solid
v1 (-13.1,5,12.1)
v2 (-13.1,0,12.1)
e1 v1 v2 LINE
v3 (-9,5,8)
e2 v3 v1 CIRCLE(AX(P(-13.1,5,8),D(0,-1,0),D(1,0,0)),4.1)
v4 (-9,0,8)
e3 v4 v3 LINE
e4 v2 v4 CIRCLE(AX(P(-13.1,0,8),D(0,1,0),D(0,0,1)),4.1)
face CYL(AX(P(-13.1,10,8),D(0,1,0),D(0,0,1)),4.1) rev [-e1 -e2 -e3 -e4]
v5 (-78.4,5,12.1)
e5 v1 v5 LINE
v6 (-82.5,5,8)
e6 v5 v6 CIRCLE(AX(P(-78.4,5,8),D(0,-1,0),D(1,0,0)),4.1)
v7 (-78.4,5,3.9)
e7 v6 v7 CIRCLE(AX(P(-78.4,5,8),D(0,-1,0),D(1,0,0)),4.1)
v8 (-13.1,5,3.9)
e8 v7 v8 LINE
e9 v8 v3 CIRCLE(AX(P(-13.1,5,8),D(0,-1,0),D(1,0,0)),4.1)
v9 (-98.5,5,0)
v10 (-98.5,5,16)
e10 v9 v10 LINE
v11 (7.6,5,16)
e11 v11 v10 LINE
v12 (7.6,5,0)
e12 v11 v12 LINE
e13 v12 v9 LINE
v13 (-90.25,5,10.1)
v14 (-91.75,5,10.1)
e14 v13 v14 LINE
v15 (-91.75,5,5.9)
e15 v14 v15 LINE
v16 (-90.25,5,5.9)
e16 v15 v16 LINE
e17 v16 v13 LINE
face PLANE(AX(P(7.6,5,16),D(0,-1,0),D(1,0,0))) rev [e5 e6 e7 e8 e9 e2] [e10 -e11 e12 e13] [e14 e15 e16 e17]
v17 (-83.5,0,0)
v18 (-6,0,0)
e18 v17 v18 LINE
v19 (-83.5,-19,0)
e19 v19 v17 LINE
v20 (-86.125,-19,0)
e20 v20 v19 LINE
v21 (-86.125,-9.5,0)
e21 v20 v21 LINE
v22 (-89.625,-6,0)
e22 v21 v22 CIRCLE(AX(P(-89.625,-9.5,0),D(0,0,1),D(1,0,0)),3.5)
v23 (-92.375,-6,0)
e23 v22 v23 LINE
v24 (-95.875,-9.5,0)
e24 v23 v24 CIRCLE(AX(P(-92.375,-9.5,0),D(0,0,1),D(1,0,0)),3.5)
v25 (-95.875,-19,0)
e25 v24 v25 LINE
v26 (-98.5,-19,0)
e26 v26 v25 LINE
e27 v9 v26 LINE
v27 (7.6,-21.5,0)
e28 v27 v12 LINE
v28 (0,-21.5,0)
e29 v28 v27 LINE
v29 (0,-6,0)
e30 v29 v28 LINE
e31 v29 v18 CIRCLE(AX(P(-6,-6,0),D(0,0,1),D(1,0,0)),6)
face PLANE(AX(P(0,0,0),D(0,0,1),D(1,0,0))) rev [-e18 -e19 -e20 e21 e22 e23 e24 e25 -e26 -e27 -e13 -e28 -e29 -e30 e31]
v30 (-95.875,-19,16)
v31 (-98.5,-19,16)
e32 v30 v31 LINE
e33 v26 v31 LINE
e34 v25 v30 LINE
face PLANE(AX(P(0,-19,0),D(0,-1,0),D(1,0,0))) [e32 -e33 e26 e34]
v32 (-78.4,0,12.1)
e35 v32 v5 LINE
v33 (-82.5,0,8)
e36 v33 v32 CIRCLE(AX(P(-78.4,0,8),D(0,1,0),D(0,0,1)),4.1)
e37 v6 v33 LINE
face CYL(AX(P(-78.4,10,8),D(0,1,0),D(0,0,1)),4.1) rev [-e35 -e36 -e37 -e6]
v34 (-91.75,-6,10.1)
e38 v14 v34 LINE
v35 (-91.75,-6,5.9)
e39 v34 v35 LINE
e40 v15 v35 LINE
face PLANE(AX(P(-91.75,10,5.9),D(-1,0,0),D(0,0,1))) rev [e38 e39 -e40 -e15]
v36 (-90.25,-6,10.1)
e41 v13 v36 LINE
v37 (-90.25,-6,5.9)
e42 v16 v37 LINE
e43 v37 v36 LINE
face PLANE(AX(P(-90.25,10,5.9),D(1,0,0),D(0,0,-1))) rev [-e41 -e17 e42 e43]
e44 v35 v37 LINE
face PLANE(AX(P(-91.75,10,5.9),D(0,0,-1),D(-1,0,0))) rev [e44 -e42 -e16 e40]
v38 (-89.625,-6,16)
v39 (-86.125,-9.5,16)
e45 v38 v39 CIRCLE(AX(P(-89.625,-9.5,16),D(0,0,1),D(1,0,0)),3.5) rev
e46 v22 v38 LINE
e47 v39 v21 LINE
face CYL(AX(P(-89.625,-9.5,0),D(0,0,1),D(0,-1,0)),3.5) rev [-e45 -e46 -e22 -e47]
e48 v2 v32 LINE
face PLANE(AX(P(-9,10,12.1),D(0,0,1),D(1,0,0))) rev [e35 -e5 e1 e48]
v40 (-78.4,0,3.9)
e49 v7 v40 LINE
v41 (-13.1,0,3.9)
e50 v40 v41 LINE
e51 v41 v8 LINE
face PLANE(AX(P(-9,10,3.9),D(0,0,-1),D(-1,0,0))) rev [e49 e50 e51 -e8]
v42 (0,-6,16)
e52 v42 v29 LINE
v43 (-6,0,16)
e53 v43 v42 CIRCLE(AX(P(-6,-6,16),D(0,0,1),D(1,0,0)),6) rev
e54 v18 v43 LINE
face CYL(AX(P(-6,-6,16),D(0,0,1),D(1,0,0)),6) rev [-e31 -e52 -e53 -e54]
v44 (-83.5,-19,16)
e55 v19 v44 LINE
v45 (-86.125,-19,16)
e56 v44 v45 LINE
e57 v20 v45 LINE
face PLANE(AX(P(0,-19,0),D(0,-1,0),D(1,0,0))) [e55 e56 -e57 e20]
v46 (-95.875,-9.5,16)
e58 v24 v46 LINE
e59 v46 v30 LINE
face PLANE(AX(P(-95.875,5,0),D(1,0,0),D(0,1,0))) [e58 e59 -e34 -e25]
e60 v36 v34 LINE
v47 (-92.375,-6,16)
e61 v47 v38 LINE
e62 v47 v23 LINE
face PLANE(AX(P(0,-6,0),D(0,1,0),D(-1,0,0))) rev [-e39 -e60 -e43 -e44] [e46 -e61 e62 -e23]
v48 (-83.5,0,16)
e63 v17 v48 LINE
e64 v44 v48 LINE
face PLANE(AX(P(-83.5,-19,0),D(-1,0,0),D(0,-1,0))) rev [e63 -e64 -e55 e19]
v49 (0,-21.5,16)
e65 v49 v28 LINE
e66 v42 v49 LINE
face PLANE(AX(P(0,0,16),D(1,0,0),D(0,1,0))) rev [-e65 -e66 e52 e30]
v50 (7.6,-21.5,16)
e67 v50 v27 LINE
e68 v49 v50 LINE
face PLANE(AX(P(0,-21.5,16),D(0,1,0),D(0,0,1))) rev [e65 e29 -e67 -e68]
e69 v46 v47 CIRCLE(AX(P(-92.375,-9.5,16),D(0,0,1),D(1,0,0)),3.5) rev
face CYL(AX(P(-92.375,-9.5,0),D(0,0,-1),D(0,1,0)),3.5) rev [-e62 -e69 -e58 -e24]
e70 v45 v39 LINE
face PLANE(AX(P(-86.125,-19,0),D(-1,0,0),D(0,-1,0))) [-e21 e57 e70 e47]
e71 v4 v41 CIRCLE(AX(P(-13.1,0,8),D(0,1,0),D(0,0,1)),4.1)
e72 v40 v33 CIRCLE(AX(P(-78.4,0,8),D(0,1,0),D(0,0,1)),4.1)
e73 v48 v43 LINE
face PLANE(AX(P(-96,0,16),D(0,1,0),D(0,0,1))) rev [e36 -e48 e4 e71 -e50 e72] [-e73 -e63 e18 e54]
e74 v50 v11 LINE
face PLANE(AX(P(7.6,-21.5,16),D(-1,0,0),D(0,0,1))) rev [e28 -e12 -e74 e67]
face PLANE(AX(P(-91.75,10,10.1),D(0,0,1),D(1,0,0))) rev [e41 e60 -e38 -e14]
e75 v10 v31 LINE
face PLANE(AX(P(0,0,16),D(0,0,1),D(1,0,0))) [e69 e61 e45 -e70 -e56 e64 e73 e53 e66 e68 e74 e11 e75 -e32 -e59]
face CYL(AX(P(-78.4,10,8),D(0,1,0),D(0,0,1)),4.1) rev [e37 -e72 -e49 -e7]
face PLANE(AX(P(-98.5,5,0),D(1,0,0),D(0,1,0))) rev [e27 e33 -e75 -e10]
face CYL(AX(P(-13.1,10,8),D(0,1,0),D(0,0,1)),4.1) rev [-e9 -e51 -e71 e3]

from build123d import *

# Parameters (mm, degrees)
EXTRUDE_1_DEPTH     = 16
SKETCH_4_W          = 1.5
SKETCH_4_H          = 4.2
SKETCH_4_W_2        = 73.5
SKETCH_4_H_2        = 8.2
CUT_EXTRUDE_1_DEPTH = 10
FILLET_1_R          = 4.1
SKETCH_6_W          = 10
SKETCH_6_H          = 16
SKETCH_6_W_2        = 1.5
SKETCH_6_H_2        = 4.2
EXTRUDE_4_DEPTH     = 11
EXTRUDE_START       = -11
SKETCH_10_W         = 0.125
SKETCH_10_H         = 16
SKETCH_10_W_2       = 2.5
EXTRUDE_6_DEPTH     = 24
FILLET_2_R          = 3.5
FILLET_3_R          = 6


with BuildPart() as part:
    # 스케치1 → 보스-돌출1 (new body)
    with BuildSketch(Plane.XY):
        Polygon((-96, 0), (0, 0), (0, -21.5), (7.6, -21.5), (7.6, 5), (-96, 5), align=None)
    extrude(amount=EXTRUDE_1_DEPTH)

    # 스케치4 → 컷-돌출1 (cut)
    with BuildSketch(Plane.XZ):
        with Locations((-91, 8)):
            Rectangle(SKETCH_4_W, SKETCH_4_H)
        with Locations((-45.75, 8)):
            Rectangle(SKETCH_4_W_2, SKETCH_4_H_2)
    extrude(amount=-CUT_EXTRUDE_1_DEPTH, mode=Mode.SUBTRACT)

    # 필렛1
    fillet_1_edges = [part.edges().sort_by_distance(p)[0] for p in [
        (-82.5, 2.5, 3.9),
        (-82.5, 2.5, 12.1),
        (-9, 2.5, 3.9),
        (-9, 2.5, 12.1),
    ]]
    fillet(fillet_1_edges, radius=FILLET_1_R - 0.0001)  # a hair under: the kernel refuses the full size

    # 스케치6 → 보스-돌출4 (add)
    with BuildSketch(Plane(origin=(0, 5, 0), x_dir=(1, 0, 0), z_dir=(0, 1, 0))):
        with Locations((-91, -8)):
            Rectangle(SKETCH_6_W, SKETCH_6_H)
        with Locations((-91, -8)):
            Rectangle(SKETCH_6_W_2, SKETCH_6_H_2, mode=Mode.SUBTRACT)
    extrude(amount=-EXTRUDE_4_DEPTH)

    # 스케치10 → 보스-돌출6 (add)
    with BuildSketch(Plane.XZ.offset(6).offset(EXTRUDE_START)):
        with Locations((-95.9375, 8)):
            Rectangle(SKETCH_10_W, SKETCH_10_H)
        with Locations((-97.25, 8)):
            Rectangle(SKETCH_10_W_2, SKETCH_10_H)
        with Locations((-86.0625, 8)):
            Rectangle(SKETCH_10_W, SKETCH_10_H)
        with Locations((-84.75, 8)):
            Rectangle(SKETCH_10_W_2, SKETCH_10_H)
    extrude(amount=EXTRUDE_6_DEPTH)

    # 필렛2
    fillet_2_edges = [part.edges().sort_by_distance(p)[0] for p in [
        (-95.875, -6, 8),
        (-86.125, -6, 8),
    ]]
    fillet(fillet_2_edges, radius=FILLET_2_R)

    # 필렛3
    fillet_3_edges = [part.edges().sort_by_distance(p)[0] for p in [
        (0, 0, 8),
    ]]
    fillet(fillet_3_edges, radius=FILLET_3_R)


solid = part.part
